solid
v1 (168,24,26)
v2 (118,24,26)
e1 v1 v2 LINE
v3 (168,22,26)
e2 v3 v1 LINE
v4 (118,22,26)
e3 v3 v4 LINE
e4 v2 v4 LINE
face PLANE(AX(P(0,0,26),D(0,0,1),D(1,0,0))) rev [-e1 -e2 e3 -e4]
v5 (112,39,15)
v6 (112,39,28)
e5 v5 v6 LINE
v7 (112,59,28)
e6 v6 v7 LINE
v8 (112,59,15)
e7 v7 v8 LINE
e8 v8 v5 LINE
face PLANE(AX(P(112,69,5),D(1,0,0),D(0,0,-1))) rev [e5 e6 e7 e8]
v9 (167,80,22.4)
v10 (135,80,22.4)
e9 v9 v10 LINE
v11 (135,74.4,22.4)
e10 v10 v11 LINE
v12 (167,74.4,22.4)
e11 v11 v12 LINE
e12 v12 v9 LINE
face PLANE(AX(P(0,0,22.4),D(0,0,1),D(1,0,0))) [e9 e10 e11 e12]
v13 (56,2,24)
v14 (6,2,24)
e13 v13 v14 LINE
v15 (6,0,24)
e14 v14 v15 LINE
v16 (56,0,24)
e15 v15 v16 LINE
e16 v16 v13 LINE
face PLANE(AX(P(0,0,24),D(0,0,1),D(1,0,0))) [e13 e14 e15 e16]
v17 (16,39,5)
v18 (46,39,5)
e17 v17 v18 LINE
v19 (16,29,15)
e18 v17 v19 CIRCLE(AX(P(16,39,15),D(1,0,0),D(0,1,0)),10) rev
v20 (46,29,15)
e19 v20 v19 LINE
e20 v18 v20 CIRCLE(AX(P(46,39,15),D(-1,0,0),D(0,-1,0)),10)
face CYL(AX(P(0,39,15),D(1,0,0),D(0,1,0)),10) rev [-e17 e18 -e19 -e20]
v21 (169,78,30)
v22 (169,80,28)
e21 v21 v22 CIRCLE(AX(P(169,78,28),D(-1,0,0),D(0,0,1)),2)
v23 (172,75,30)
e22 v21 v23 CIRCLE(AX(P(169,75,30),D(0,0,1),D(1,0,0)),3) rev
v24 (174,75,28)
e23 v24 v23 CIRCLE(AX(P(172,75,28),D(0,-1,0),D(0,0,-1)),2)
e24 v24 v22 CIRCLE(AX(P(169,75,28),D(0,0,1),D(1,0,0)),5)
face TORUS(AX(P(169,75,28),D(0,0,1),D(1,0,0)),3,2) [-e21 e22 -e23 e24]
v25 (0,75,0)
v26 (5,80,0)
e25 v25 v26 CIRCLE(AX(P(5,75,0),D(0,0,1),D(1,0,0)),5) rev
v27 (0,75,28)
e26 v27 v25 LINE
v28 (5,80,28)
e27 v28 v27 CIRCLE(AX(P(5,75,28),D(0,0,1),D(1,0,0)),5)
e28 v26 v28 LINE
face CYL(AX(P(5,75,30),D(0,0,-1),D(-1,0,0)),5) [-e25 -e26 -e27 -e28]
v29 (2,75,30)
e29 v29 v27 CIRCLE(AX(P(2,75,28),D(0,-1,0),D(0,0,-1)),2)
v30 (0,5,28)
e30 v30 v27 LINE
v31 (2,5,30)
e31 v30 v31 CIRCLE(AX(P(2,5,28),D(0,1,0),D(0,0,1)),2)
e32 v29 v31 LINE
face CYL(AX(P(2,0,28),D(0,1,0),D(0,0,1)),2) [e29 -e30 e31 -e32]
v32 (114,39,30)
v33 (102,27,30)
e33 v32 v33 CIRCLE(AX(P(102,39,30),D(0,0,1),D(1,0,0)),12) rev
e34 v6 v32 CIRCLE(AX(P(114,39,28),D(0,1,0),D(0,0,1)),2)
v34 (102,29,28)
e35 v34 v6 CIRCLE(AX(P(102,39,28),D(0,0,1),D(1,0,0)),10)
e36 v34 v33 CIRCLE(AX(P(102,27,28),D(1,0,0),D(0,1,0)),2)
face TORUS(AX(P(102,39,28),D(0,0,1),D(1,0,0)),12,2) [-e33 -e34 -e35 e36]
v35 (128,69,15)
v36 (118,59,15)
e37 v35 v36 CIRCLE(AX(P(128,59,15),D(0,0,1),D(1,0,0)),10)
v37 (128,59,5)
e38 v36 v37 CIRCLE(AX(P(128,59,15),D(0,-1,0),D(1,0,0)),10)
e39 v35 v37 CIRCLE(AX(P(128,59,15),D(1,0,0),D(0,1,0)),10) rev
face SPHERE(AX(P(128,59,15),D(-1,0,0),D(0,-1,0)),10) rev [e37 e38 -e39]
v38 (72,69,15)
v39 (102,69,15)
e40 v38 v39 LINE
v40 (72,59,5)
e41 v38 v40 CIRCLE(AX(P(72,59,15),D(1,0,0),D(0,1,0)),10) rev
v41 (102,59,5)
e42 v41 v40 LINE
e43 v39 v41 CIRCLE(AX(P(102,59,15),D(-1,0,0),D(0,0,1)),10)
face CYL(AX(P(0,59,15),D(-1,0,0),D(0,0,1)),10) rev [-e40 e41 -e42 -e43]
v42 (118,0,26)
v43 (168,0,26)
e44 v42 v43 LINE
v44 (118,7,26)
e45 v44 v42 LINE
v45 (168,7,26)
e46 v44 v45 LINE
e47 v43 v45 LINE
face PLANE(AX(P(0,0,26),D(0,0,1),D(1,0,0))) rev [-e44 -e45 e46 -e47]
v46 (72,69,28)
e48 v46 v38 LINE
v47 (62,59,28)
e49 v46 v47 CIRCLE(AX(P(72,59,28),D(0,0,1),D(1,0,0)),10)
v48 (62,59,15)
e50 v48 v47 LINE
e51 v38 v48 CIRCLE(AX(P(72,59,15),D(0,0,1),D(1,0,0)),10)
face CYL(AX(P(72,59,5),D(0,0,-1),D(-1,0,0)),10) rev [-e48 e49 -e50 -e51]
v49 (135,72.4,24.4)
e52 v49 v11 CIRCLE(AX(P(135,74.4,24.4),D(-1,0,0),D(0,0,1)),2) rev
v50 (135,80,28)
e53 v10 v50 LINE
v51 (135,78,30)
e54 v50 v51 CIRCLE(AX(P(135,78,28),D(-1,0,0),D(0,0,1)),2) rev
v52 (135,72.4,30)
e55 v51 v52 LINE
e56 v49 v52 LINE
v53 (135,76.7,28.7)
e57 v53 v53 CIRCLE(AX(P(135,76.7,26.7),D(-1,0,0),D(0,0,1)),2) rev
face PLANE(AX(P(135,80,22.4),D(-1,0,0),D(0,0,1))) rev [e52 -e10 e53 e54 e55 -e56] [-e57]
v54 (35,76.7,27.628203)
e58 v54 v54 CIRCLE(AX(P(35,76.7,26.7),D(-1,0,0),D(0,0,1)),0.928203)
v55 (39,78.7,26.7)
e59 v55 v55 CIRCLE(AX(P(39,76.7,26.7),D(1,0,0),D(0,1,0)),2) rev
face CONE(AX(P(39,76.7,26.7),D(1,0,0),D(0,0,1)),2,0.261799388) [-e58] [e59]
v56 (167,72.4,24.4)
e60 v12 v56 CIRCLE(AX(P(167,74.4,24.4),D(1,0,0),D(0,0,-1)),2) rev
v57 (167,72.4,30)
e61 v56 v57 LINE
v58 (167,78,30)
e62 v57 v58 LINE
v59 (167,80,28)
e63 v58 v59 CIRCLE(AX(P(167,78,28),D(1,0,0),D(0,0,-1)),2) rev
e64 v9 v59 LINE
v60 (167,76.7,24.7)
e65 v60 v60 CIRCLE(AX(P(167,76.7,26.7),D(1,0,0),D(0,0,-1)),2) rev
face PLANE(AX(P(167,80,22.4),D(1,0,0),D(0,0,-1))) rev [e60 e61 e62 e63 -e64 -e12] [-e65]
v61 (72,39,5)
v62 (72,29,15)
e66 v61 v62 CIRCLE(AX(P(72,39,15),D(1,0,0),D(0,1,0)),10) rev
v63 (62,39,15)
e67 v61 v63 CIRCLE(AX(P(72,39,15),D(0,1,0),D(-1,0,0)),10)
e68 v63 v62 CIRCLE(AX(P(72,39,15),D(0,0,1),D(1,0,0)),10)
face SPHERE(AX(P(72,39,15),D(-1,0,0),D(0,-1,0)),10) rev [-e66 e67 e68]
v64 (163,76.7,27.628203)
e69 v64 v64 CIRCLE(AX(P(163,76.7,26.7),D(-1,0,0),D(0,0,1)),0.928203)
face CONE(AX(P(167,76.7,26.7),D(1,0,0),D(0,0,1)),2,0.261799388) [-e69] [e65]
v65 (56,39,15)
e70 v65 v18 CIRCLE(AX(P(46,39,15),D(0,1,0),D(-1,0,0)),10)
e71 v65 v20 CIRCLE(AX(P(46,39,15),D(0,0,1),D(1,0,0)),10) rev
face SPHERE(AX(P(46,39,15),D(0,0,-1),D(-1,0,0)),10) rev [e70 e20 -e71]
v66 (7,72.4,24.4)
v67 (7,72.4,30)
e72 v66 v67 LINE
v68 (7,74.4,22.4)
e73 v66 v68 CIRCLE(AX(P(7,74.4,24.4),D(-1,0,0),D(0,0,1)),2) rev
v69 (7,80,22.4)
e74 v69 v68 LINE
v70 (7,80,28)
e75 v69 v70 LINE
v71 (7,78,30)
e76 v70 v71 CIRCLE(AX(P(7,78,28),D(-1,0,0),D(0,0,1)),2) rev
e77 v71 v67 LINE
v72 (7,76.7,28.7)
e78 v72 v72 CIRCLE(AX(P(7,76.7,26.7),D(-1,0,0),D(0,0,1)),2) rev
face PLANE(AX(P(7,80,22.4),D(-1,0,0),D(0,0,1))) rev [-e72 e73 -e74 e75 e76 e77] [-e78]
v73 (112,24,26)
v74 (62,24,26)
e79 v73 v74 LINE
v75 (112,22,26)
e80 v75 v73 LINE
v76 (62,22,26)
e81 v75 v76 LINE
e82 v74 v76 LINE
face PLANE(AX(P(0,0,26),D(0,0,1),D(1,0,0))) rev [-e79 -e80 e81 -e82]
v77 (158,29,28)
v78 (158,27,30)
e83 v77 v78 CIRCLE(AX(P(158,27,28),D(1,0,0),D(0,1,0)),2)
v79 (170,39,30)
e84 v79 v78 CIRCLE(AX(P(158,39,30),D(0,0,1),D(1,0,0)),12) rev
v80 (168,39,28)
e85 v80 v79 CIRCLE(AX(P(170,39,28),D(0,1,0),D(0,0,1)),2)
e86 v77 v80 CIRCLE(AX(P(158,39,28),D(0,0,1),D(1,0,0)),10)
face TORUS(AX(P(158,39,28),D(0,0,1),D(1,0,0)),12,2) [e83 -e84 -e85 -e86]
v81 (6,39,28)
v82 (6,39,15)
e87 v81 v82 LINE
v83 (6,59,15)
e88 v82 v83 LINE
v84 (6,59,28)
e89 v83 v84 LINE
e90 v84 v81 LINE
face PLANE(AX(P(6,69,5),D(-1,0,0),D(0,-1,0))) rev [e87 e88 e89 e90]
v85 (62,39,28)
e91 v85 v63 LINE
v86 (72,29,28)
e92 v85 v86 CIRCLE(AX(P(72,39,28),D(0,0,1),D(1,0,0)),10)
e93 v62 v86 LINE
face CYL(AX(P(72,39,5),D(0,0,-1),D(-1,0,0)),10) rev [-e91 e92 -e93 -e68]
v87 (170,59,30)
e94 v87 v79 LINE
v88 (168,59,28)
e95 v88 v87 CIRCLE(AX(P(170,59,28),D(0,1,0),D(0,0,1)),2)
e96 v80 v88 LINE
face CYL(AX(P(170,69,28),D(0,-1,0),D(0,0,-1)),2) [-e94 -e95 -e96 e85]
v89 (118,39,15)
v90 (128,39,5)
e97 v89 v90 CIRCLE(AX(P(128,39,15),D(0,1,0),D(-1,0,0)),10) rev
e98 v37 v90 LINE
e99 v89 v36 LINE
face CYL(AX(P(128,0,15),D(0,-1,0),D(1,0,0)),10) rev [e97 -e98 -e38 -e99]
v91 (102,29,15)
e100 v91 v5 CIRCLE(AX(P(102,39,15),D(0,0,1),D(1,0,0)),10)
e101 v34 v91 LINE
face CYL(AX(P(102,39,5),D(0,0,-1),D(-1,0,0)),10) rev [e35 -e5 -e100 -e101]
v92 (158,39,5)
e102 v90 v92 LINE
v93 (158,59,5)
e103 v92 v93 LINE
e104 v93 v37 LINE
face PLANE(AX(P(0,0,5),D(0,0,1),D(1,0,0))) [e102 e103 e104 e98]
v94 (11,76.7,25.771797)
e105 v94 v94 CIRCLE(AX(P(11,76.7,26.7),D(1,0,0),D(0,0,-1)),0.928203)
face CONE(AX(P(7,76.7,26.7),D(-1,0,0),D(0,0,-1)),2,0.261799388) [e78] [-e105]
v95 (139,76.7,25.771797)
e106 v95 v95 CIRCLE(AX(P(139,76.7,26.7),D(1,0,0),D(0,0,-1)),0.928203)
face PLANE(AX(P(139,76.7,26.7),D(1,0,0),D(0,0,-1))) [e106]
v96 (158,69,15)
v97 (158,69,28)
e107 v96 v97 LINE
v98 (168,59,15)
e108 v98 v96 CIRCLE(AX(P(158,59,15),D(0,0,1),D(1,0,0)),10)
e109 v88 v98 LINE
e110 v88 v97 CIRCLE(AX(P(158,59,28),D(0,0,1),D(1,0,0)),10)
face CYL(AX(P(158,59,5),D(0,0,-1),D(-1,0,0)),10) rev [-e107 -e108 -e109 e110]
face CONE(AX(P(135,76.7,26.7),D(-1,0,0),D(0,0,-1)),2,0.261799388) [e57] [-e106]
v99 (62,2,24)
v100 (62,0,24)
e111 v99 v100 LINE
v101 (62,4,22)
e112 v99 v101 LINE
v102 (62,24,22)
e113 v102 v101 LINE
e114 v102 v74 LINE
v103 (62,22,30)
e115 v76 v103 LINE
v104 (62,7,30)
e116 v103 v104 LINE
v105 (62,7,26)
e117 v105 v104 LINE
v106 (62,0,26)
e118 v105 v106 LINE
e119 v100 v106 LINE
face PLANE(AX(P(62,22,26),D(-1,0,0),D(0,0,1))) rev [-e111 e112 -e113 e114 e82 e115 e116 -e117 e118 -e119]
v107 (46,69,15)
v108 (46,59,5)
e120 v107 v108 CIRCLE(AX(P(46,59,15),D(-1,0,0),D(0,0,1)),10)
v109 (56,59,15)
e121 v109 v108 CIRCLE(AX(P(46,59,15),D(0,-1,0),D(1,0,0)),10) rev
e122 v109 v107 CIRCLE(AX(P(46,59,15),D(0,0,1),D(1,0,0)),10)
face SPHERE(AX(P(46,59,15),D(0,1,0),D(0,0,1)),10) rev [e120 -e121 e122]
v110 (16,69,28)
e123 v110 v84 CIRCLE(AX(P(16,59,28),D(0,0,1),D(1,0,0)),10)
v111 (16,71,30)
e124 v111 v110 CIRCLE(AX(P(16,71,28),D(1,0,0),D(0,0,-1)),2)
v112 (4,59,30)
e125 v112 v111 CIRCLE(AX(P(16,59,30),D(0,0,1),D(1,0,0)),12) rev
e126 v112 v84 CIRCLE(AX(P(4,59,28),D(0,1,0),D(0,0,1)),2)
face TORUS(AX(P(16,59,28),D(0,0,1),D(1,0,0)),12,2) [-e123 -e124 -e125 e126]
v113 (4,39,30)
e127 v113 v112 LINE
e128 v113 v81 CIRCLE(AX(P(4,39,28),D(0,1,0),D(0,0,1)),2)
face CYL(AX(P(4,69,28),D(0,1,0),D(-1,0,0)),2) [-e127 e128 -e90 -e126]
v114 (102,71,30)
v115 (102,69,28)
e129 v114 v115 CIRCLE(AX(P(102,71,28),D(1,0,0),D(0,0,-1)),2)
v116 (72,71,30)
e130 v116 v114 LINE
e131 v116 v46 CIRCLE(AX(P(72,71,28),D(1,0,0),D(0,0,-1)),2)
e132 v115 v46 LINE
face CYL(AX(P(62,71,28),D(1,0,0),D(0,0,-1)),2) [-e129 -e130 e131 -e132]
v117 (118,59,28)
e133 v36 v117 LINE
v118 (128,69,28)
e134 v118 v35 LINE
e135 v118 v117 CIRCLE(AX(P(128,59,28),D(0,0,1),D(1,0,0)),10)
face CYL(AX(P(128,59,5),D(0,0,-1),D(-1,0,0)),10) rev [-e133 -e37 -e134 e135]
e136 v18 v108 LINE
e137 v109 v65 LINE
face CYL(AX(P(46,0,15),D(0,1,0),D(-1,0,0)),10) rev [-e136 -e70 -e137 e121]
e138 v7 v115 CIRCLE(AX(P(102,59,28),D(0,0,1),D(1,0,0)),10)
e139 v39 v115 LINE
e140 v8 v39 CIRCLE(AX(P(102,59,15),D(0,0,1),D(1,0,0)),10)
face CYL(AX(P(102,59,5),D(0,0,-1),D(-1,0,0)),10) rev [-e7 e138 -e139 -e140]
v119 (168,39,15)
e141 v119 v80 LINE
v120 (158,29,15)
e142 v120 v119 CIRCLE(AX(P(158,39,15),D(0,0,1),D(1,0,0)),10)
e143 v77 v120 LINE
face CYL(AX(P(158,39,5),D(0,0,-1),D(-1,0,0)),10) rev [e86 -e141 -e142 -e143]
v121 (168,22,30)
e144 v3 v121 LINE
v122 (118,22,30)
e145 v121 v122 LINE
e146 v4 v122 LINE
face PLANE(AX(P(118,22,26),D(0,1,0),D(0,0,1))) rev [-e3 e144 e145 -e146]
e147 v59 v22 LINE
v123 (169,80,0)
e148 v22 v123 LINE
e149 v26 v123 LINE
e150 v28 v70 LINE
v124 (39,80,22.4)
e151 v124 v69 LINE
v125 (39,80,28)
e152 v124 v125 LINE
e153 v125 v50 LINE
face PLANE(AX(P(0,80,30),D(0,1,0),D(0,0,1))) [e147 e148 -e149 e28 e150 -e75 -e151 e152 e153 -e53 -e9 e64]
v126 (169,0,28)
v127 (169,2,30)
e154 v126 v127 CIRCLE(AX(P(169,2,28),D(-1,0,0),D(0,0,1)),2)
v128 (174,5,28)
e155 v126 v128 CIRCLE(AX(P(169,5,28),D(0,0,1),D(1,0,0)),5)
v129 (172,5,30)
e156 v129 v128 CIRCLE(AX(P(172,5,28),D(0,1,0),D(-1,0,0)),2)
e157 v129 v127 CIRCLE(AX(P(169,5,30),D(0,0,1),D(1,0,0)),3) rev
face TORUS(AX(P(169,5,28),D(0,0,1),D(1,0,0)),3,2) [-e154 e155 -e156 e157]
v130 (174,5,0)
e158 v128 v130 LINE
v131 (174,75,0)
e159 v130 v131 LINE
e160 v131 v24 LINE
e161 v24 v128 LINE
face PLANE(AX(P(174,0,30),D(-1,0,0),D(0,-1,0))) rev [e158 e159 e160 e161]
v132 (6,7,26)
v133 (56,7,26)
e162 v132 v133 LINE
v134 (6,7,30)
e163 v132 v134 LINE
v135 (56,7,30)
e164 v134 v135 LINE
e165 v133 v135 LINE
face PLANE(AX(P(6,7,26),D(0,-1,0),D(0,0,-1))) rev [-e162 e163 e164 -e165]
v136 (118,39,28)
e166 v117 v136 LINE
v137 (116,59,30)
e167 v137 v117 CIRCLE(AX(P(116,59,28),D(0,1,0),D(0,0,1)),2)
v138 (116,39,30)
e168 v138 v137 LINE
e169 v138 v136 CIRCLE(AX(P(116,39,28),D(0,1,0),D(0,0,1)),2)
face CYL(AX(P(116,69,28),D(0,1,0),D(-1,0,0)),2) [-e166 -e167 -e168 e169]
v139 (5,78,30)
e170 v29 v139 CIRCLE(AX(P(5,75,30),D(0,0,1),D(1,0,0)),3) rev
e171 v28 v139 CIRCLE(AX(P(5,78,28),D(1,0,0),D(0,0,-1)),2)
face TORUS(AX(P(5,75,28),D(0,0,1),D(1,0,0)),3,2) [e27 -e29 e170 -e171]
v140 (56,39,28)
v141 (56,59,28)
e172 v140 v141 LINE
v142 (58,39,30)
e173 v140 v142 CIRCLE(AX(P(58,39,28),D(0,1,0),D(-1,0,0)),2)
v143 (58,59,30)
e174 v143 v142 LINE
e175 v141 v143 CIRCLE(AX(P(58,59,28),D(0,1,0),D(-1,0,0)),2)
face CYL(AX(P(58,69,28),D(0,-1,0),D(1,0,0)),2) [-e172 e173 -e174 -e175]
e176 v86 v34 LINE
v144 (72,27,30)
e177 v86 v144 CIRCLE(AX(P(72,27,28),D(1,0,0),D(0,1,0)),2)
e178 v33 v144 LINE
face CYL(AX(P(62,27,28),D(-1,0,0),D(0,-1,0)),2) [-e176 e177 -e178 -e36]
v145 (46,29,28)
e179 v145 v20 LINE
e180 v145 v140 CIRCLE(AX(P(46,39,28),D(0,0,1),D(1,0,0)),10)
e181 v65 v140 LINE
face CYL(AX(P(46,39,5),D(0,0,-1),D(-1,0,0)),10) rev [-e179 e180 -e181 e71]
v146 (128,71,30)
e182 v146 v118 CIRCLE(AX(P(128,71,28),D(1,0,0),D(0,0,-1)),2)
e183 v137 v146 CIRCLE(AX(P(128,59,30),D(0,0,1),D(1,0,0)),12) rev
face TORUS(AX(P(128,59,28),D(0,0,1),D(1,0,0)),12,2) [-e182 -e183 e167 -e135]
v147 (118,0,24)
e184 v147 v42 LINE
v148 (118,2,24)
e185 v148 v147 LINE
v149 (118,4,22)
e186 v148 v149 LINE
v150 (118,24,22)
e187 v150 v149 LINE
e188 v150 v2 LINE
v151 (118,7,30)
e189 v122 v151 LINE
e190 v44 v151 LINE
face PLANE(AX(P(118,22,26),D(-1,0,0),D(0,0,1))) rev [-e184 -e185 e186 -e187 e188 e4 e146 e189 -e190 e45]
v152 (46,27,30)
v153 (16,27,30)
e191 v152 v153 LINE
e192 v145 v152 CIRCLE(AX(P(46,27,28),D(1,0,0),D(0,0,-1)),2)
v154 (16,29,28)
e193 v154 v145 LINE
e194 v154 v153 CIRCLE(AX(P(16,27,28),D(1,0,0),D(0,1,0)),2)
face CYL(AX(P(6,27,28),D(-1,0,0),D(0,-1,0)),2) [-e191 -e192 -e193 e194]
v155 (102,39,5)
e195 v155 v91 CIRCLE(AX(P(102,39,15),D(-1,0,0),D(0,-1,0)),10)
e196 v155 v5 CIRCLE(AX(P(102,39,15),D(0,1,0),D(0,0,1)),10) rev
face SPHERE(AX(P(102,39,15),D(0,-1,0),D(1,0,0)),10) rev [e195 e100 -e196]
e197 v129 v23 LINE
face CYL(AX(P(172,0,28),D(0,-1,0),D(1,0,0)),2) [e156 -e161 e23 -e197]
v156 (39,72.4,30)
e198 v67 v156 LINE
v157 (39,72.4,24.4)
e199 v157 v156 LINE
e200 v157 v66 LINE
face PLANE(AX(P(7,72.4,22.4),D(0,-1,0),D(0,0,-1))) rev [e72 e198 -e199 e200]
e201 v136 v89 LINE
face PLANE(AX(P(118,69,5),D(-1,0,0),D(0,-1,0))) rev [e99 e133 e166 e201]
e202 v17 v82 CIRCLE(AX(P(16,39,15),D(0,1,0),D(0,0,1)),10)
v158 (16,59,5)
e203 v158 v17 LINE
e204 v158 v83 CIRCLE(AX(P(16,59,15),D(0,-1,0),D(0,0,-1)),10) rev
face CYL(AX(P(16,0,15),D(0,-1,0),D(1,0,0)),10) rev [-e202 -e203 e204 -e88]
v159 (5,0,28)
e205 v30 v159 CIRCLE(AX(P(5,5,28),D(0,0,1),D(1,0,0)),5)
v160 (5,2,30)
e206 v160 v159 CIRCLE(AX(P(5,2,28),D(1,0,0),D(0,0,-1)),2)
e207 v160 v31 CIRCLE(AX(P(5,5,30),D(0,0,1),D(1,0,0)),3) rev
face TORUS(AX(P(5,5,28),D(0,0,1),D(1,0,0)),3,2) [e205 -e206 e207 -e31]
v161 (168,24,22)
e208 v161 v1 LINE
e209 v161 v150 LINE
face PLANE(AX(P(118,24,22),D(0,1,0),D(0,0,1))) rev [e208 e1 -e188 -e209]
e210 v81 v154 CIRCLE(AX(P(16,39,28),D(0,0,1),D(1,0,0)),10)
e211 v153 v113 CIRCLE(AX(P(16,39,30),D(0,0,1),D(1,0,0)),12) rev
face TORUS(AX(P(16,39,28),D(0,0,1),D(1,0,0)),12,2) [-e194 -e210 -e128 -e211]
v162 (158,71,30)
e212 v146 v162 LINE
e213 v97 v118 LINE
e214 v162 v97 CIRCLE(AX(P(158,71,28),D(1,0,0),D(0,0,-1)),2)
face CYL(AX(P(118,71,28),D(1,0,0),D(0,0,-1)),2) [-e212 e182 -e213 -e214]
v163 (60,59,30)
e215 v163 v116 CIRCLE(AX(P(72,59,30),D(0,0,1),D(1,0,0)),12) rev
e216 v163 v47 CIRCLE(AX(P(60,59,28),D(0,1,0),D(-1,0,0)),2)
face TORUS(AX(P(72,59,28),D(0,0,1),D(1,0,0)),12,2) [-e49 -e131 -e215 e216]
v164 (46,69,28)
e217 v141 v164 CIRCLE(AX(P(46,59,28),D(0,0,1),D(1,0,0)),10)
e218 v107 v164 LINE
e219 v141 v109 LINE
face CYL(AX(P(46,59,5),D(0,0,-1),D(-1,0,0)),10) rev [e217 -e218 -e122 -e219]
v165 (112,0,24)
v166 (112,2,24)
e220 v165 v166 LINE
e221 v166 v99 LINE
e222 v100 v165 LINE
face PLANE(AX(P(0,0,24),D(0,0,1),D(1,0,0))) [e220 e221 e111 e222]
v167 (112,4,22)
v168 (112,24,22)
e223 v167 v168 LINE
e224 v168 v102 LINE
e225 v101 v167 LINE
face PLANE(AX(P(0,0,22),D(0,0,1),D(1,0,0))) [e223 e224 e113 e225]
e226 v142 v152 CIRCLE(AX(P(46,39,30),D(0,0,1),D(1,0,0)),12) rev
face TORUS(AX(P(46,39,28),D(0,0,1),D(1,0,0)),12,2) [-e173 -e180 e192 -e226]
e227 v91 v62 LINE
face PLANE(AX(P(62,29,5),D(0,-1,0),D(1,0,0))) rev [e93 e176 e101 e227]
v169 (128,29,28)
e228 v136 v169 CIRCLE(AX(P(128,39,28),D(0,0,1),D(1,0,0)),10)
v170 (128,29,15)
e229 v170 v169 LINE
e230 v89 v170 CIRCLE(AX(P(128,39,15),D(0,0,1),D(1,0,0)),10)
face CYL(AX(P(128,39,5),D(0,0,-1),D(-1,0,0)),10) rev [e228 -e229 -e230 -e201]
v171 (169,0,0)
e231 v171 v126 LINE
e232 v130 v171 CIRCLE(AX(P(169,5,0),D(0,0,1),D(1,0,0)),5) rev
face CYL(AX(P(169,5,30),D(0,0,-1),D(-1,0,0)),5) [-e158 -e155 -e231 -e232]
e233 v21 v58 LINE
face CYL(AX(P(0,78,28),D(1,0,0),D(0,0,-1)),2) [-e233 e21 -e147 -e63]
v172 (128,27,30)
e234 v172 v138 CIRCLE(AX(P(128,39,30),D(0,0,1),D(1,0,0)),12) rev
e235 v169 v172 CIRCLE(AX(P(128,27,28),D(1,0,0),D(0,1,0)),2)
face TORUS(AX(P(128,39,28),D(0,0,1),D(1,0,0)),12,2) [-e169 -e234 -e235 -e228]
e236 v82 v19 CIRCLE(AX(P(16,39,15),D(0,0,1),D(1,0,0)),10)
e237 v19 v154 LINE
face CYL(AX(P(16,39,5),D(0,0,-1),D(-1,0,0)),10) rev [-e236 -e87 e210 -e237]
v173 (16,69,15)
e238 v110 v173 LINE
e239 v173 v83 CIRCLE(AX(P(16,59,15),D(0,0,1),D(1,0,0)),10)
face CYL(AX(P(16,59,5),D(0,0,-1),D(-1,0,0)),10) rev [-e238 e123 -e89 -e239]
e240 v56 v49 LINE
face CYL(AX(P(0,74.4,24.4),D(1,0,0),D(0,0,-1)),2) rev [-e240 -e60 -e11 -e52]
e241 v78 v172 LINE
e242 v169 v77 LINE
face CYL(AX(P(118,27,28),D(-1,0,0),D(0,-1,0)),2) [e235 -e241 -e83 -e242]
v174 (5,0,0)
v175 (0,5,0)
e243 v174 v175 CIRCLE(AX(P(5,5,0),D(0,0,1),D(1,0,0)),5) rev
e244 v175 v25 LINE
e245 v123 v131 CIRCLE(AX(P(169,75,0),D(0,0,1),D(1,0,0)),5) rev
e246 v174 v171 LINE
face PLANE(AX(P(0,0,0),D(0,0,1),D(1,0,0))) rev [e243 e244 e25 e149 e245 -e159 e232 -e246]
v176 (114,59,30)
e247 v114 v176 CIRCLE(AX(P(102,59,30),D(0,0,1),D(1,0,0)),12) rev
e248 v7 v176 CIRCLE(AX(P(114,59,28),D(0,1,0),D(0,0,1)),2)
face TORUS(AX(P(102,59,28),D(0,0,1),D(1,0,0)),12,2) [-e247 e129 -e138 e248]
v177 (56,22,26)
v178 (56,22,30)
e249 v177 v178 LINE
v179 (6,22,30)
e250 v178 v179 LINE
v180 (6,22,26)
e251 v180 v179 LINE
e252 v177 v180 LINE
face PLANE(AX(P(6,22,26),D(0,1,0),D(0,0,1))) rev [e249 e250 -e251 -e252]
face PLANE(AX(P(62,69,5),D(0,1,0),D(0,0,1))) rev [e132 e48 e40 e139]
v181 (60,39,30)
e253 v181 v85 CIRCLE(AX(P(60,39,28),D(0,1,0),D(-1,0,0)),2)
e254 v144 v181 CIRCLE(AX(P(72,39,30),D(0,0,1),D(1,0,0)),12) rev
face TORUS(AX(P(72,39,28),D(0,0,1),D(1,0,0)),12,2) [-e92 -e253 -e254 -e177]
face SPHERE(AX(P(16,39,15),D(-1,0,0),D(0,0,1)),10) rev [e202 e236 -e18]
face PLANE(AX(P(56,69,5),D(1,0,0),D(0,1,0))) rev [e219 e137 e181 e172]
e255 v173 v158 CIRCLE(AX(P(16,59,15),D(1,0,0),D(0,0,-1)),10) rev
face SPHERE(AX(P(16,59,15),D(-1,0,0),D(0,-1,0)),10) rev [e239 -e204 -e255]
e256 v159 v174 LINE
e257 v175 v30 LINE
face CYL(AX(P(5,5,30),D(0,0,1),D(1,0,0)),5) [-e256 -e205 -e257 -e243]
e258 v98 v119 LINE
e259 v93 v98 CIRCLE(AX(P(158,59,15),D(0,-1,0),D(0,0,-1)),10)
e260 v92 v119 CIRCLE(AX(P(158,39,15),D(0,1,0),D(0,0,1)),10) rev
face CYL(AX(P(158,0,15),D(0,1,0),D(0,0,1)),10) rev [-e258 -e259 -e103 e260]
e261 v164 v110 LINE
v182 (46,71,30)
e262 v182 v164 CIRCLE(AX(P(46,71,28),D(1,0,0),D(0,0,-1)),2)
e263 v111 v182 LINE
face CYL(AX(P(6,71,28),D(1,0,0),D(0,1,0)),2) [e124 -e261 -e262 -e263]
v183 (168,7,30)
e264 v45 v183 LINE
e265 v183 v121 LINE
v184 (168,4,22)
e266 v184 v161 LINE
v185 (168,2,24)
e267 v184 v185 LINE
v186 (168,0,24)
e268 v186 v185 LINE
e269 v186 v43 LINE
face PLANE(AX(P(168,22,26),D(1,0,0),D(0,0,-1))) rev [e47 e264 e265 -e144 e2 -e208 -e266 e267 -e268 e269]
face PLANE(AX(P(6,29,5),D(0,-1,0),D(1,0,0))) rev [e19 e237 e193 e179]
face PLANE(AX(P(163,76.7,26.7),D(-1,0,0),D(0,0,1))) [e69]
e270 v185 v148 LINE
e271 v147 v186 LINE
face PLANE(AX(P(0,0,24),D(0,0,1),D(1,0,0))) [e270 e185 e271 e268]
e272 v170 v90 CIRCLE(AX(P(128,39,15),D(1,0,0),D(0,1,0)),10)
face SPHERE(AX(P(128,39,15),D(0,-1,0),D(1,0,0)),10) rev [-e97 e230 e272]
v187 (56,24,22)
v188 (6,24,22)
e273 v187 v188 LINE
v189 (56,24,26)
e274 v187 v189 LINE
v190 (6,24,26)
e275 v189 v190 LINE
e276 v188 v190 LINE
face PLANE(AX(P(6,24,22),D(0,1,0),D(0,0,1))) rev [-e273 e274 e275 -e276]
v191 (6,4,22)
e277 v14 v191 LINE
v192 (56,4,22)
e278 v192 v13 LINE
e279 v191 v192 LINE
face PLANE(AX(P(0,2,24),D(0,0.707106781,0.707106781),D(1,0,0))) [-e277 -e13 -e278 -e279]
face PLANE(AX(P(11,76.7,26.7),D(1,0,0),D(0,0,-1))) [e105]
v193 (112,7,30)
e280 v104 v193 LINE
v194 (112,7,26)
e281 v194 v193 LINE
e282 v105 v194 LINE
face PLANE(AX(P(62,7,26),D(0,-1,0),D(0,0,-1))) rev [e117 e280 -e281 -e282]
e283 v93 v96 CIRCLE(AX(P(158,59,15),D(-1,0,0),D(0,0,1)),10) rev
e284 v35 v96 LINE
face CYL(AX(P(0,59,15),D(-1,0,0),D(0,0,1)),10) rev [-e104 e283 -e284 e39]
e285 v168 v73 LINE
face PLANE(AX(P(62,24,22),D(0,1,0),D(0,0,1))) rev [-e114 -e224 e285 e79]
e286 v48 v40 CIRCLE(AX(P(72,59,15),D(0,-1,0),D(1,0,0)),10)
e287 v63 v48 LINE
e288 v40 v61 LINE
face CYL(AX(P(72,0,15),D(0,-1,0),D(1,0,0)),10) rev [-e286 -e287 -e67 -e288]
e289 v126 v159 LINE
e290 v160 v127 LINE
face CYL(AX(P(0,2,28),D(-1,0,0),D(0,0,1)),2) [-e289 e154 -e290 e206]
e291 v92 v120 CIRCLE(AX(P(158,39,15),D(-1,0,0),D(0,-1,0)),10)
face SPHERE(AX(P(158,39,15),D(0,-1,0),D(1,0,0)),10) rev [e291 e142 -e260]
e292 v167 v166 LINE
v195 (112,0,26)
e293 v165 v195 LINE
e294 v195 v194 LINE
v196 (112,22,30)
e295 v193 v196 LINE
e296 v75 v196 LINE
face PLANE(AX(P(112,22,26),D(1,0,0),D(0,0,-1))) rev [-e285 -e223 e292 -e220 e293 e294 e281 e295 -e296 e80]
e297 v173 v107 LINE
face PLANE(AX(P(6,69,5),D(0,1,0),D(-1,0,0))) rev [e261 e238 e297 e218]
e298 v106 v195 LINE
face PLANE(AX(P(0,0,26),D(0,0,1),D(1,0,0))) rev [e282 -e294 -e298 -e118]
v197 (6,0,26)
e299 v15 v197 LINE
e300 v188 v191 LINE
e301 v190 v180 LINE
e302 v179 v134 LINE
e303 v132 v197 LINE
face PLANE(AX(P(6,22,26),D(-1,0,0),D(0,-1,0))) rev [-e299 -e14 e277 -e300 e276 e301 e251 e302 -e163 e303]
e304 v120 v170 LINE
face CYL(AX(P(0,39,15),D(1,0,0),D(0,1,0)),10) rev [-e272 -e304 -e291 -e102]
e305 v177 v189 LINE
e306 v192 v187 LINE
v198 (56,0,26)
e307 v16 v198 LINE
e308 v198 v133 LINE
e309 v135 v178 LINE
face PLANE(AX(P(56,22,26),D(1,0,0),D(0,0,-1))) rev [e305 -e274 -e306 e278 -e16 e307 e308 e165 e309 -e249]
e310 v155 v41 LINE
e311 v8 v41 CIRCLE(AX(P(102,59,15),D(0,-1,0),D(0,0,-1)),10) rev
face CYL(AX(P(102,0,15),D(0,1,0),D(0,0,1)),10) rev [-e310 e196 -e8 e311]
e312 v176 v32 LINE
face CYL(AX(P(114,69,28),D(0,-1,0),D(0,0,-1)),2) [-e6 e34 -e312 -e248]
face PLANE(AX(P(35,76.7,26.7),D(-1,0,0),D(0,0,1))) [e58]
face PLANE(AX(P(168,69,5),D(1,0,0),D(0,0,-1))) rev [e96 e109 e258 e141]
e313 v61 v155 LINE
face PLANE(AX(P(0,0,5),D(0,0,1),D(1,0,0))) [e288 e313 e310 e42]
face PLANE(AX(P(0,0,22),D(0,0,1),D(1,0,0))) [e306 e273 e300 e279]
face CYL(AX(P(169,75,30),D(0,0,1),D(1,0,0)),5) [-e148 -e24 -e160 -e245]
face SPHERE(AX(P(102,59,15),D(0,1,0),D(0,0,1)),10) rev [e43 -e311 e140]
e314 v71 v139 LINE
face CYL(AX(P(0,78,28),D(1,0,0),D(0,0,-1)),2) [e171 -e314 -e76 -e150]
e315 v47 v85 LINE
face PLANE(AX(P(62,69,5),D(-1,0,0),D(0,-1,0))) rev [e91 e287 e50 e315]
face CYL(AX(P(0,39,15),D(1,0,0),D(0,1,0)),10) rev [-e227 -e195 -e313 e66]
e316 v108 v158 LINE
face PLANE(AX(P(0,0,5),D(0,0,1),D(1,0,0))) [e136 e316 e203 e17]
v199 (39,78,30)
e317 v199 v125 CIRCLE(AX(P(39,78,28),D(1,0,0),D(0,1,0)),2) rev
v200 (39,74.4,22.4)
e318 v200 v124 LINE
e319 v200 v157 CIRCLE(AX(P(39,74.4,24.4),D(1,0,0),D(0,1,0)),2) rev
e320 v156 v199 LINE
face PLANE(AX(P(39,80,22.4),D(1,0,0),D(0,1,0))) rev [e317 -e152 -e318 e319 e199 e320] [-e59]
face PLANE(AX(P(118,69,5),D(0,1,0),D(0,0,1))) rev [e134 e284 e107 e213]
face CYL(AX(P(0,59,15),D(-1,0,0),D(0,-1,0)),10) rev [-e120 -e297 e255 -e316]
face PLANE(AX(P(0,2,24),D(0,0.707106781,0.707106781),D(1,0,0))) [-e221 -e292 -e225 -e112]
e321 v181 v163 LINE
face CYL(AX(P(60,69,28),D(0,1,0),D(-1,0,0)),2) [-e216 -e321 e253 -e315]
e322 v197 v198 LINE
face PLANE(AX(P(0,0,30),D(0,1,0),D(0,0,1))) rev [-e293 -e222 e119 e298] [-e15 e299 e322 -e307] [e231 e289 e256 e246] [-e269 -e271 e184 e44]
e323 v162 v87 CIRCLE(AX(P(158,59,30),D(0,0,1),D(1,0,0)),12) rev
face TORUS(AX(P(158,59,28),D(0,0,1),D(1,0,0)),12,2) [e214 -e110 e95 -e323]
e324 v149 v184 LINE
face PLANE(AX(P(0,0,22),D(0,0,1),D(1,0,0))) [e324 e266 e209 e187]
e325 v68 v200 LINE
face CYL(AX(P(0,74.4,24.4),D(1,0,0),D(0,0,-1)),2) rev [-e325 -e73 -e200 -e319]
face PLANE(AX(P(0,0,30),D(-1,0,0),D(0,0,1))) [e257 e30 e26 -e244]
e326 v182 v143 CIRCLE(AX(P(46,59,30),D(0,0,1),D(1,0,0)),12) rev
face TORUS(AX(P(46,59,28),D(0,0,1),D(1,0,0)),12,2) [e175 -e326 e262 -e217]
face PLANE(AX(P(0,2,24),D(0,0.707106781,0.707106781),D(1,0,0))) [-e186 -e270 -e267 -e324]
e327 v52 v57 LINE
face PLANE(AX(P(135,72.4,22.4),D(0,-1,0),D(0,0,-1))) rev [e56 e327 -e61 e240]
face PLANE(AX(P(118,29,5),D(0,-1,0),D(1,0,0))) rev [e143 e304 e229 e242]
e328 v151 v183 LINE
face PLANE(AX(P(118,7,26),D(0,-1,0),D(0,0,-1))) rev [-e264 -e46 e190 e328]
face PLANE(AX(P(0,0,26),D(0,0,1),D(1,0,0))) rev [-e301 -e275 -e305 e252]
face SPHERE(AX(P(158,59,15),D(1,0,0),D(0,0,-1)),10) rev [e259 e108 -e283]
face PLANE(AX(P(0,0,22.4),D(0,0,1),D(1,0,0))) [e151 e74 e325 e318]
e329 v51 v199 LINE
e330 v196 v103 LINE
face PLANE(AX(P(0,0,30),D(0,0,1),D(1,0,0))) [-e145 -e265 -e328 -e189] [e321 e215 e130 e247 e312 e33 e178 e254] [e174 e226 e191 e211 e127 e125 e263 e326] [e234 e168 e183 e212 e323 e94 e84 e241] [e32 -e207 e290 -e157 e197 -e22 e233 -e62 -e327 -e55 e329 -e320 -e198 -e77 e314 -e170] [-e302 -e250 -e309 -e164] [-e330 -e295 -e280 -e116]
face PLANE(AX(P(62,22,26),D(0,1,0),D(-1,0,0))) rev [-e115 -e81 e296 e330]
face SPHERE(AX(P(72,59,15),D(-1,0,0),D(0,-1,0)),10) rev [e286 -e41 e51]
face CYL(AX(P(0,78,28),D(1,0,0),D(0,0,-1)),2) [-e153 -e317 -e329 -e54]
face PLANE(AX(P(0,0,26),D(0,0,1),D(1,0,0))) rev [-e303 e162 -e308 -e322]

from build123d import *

# Parameters (mm, degrees)
SKICA1_W                = 174
SKICA1_H                = 80
P_IDAT_VYSUNUT_M1_DEPTH = 30
SKETCH2_W               = 50
SKETCH2_H               = 40
CUT_EXTRUDE2_DEPTH      = 25
FILLET1_R               = 10
FILLET2_R               = 10
FILLET3_R               = 10
FILLET6_R               = 2
FILLET7_R               = 2
FILLET8_R               = 2
FILLET9_R               = 5
SKETCH6_W               = 50
SKETCH6_H               = 15
CUT_EXTRUDE3_DEPTH      = 4
SKETCH12_W              = 50
SKETCH12_H              = 4
CUT_EXTRUDE5_DEPTH      = 2
SKETCH7_W               = 50
SKETCH7_H               = 20
CUT_EXTRUDE4_DEPTH      = 4
CHAMFER15_SIZE          = 2
SKETCH13_W              = 32
SKETCH13_H              = 7.6
CUT_EXTRUDE6_DEPTH      = 7.6
FILLET10_R              = 2
SKETCH22_R              = 2
BOSS_EXTRUDE7_DEPTH     = 4
BOSS_EXTRUDE7_TAPER     = 15
SKICA5_R                = 2
P_IDAT_VYSUNUT_M5_DEPTH = 4
P_IDAT_VYSUNUT_M5_TAPER = 15
SKICA6_R                = 2
P_IDAT_VYSUNUT_M6_DEPTH = 4
P_IDAT_VYSUNUT_M6_TAPER = 15
SKICA9_R                = 2
P_IDAT_VYSUNUT_M9_DEPTH = 4
P_IDAT_VYSUNUT_M9_TAPER = 15


# Some blends are built 0.0001 mm under size
with BuildPart() as part:
    # Skica1 → Přidat vysunutím1 (new body)
    with BuildSketch(Plane.XY):
        with Locations((87, 40)):
            Rectangle(SKICA1_W, SKICA1_H)
    extrude(amount=P_IDAT_VYSUNUT_M1_DEPTH)

    # Sketch2 → Cut-Extrude2 (cut)
    with BuildSketch(Plane.XY.offset(30)):
        with Locations((31, 49)):
            Rectangle(SKETCH2_W, SKETCH2_H)
        with Locations((87, 49)):
            Rectangle(SKETCH2_W, SKETCH2_H)
        with Locations((143, 49)):
            Rectangle(SKETCH2_W, SKETCH2_H)
    extrude(amount=-CUT_EXTRUDE2_DEPTH, mode=Mode.SUBTRACT)

    # Fillet1
    fillet1_edges = [part.edges().sort_by_distance(p)[0] for p in [
        (6, 49, 5),
        (6, 29, 17.5),
        (31, 69, 5),
        (6, 69, 17.5),
        (56, 49, 5),
        (56, 69, 17.5),
        (31, 29, 5),
        (56, 29, 17.5),
    ]]
    fillet(fillet1_edges, radius=FILLET1_R)

    # Fillet2
    fillet2_edges = [part.edges().sort_by_distance(p)[0] for p in [
        (62, 49, 5),
        (62, 29, 17.5),
        (87, 69, 5),
        (62, 69, 17.5),
        (112, 49, 5),
        (112, 69, 17.5),
        (87, 29, 5),
        (112, 29, 17.5),
    ]]
    fillet(fillet2_edges, radius=FILLET2_R)

    # Fillet3
    fillet3_edges = [part.edges().sort_by_distance(p)[0] for p in [
        (118, 49, 5),
        (118, 29, 17.5),
        (143, 69, 5),
        (118, 69, 17.5),
        (168, 49, 5),
        (168, 69, 17.5),
        (143, 29, 5),
        (168, 29, 17.5),
    ]]
    fillet(fillet3_edges, radius=FILLET3_R)

    # Fillet6
    fillet6_edges = [part.edges().sort_by_distance(p)[0] for p in [
        (112, 49, 30),
        (87, 29, 30),
        (62, 49, 30),
        (87, 69, 30),
        (109.071067812, 66.071067812, 30),
        (109.071067812, 31.928932188, 30),
        (64.928932188, 31.928932188, 30),
        (64.928932188, 66.071067812, 30),
    ]]
    fillet(fillet6_edges, radius=FILLET6_R)

    # Fillet7
    fillet7_edges = [part.edges().sort_by_distance(p)[0] for p in [
        (143, 69, 30),
        (168, 49, 30),
        (143, 29, 30),
        (118, 49, 30),
        (165.071067812, 66.071067812, 30),
        (165.071067812, 31.928932188, 30),
        (120.928932188, 31.928932188, 30),
        (120.928932188, 66.071067812, 30),
        (56, 49, 30),
        (31, 29, 30),
        (6, 49, 30),
        (31, 69, 30),
        (53.071067812, 31.928932188, 30),
        (8.928932188, 31.928932188, 30),
        (8.928932188, 66.071067812, 30),
        (53.071067812, 66.071067812, 30),
    ]]
    fillet(fillet7_edges, radius=FILLET7_R)

    # Fillet8
    fillet8_edges = [part.edges().sort_by_distance(p)[0] for p in [
        (87, 0, 30),
        (0, 40, 30),
        (87, 80, 30),
        (174, 40, 30),
    ]]
    fillet(fillet8_edges, radius=FILLET8_R)

    # Fillet9
    # the kernel refuses this fillet: 5 mm, written as the material it takes off along each edge
    with BuildSketch(Plane(origin=(5, 5, 30), x_dir=(-1, 0, 0), z_dir=(0, 1, 0))) as fillet9_piece_1:
        with BuildLine():
            CenterArc((3, -2), 2, 0, 90)
            Line((5, -2), (5, 0))
            Line((5, 0), (3, 0))
        make_face()
    revolve(axis=Axis((5, 5, 30), (0, 0, 1)), revolution_arc=90, mode=Mode.SUBTRACT)
    with BuildSketch(Plane(origin=(5, 75, 30), x_dir=(0, 1, 0), z_dir=(1, 0, 0))) as fillet9_piece_2:
        with BuildLine():
            CenterArc((3, -2), 2, 0, 90)
            Line((5, -2), (5, 0))
            Line((5, 0), (3, 0))
        make_face()
    revolve(axis=Axis((5, 75, 30), (0, 0, 1)), revolution_arc=90, mode=Mode.SUBTRACT)
    with BuildSketch(Plane(origin=(169, 5, 30), x_dir=(0, -1, 0), z_dir=(-1, 0, 0))) as fillet9_piece_3:
        with BuildLine():
            CenterArc((3, -2), 2, 0, 90)
            Line((5, -2), (5, 0))
            Line((5, 0), (3, 0))
        make_face()
    revolve(axis=Axis((169, 5, 30), (0, 0, 1)), revolution_arc=90, mode=Mode.SUBTRACT)
    with BuildSketch(Plane(origin=(169, 75, 30), x_dir=(1, 0, 0), z_dir=(0, -1, 0))) as fillet9_piece_4:
        with BuildLine():
            CenterArc((3, -2), 2, 0, 90)
            Line((5, -2), (5, 0))
            Line((5, 0), (3, 0))
        make_face()
    revolve(axis=Axis((169, 75, 30), (0, 0, 1)), revolution_arc=90, mode=Mode.SUBTRACT)
    with BuildSketch(Plane(origin=(174, 80, -12.5), x_dir=(0, -1, 0), z_dir=(0, 0, 1)), Plane(origin=(174, 0, -12.5), x_dir=(-1, 0, 0), z_dir=(0, 0, 1))) as fillet9_piece_5:
        with BuildLine():
            CenterArc((FILLET9_R, -FILLET9_R), FILLET9_R, 90, 90)
            Line((0, -FILLET9_R), (0, 0))
            Line((0, 0), (FILLET9_R, 0))
        make_face()
    extrude(amount=42.5, mode=Mode.SUBTRACT)
    with BuildSketch(Plane(origin=(0, 80, -12.5), x_dir=(0, -1, 0), z_dir=(0, 0, 1)), Plane(origin=(0, 0, -12.5), x_dir=(1, 0, 0), z_dir=(0, 0, 1))) as fillet9_piece_6:
        with BuildLine():
            CenterArc((FILLET9_R, FILLET9_R), FILLET9_R, 180, 90)
            Line((0, FILLET9_R), (0, 0))
            Line((0, 0), (FILLET9_R, 0))
        make_face()
    extrude(amount=42.5, mode=Mode.SUBTRACT)

    # Sketch6 → Cut-Extrude3 (cut)
    with BuildSketch(Plane.XY.offset(30)):
        with Locations((31, 14.5)):
            Rectangle(SKETCH6_W, SKETCH6_H)
        with Locations((87, 14.5)):
            Rectangle(SKETCH6_W, SKETCH6_H)
        with Locations((143, 14.5)):
            Rectangle(SKETCH6_W, SKETCH6_H)
    extrude(amount=-CUT_EXTRUDE3_DEPTH, mode=Mode.SUBTRACT)

    # Sketch12 → Cut-Extrude5 (cut)
    with BuildSketch(Plane.XY.offset(26)):
        with Locations((31, 2)):
            Rectangle(SKETCH12_W, SKETCH12_H)
        with Locations((87, 2)):
            Rectangle(SKETCH12_W, SKETCH12_H)
        with Locations((143, 2)):
            Rectangle(SKETCH12_W, SKETCH12_H)
    extrude(amount=-CUT_EXTRUDE5_DEPTH, mode=Mode.SUBTRACT)

    # Sketch7 → Cut-Extrude4 (cut)
    with BuildSketch(Plane.XY.offset(26)):
        with Locations((31, 14)):
            Rectangle(SKETCH7_W, SKETCH7_H)
        with Locations((143, 14)):
            Rectangle(SKETCH7_W, SKETCH7_H)
        with Locations((87, 14)):
            Rectangle(SKETCH7_W, SKETCH7_H)
    extrude(amount=-CUT_EXTRUDE4_DEPTH, mode=Mode.SUBTRACT)

    # Chamfer15
    chamfer15_edges = [part.edges().sort_by_distance(p)[0] for p in [
        (31, 4, 24),
        (143, 4, 24),
        (87, 4, 24),
    ]]
    chamfer(chamfer15_edges, length=CHAMFER15_SIZE - 0.0001)  # a hair under: the kernel refuses the full size

    # Sketch13 → Cut-Extrude6 (cut)
    with BuildSketch(Plane.XY.offset(30)):
        with Locations((23, 76.2)):
            Rectangle(SKETCH13_W, SKETCH13_H)
        with Locations((151, 76.2)):
            Rectangle(SKETCH13_W, SKETCH13_H)
    extrude(amount=-CUT_EXTRUDE6_DEPTH, mode=Mode.SUBTRACT)

    # Fillet10
    fillet10_edges = [part.edges().sort_by_distance(p)[0] for p in [
        (23, 72.4, 22.4),
        (151, 72.4, 22.4),
    ]]
    fillet(fillet10_edges, radius=FILLET10_R)

    # Sketch22 → Boss-Extrude7 (add)
    with BuildSketch(Plane.ZY.offset(-39)):
        with Locations((26.7, 76.7)):
            Circle(SKETCH22_R)
    extrude(amount=BOSS_EXTRUDE7_DEPTH, taper=BOSS_EXTRUDE7_TAPER)

    # Skica5 → Přidat vysunutím5 (add)
    with BuildSketch(Plane.ZY.offset(-167)):
        with Locations((26.7, 76.7)):
            Circle(SKICA5_R)
    extrude(amount=P_IDAT_VYSUNUT_M5_DEPTH, taper=P_IDAT_VYSUNUT_M5_TAPER)

    # Skica6 → Přidat vysunutím6 (add)
    with BuildSketch(Plane(origin=(135, 0, 0), x_dir=(0, 0, -1), z_dir=(1, 0, 0))):
        with Locations((-26.7, 76.7)):
            Circle(SKICA6_R)
    extrude(amount=P_IDAT_VYSUNUT_M6_DEPTH, taper=P_IDAT_VYSUNUT_M6_TAPER)

    # Skica9 → Přidat vysunutím9 (add)
    with BuildSketch(Plane(origin=(7, 0, 0), x_dir=(0, 0, -1), z_dir=(1, 0, 0))):
        with Locations((-26.7, 76.7)):
            Circle(SKICA9_R)
    extrude(amount=P_IDAT_VYSUNUT_M9_DEPTH, taper=P_IDAT_VYSUNUT_M9_TAPER)


solid = part.part
